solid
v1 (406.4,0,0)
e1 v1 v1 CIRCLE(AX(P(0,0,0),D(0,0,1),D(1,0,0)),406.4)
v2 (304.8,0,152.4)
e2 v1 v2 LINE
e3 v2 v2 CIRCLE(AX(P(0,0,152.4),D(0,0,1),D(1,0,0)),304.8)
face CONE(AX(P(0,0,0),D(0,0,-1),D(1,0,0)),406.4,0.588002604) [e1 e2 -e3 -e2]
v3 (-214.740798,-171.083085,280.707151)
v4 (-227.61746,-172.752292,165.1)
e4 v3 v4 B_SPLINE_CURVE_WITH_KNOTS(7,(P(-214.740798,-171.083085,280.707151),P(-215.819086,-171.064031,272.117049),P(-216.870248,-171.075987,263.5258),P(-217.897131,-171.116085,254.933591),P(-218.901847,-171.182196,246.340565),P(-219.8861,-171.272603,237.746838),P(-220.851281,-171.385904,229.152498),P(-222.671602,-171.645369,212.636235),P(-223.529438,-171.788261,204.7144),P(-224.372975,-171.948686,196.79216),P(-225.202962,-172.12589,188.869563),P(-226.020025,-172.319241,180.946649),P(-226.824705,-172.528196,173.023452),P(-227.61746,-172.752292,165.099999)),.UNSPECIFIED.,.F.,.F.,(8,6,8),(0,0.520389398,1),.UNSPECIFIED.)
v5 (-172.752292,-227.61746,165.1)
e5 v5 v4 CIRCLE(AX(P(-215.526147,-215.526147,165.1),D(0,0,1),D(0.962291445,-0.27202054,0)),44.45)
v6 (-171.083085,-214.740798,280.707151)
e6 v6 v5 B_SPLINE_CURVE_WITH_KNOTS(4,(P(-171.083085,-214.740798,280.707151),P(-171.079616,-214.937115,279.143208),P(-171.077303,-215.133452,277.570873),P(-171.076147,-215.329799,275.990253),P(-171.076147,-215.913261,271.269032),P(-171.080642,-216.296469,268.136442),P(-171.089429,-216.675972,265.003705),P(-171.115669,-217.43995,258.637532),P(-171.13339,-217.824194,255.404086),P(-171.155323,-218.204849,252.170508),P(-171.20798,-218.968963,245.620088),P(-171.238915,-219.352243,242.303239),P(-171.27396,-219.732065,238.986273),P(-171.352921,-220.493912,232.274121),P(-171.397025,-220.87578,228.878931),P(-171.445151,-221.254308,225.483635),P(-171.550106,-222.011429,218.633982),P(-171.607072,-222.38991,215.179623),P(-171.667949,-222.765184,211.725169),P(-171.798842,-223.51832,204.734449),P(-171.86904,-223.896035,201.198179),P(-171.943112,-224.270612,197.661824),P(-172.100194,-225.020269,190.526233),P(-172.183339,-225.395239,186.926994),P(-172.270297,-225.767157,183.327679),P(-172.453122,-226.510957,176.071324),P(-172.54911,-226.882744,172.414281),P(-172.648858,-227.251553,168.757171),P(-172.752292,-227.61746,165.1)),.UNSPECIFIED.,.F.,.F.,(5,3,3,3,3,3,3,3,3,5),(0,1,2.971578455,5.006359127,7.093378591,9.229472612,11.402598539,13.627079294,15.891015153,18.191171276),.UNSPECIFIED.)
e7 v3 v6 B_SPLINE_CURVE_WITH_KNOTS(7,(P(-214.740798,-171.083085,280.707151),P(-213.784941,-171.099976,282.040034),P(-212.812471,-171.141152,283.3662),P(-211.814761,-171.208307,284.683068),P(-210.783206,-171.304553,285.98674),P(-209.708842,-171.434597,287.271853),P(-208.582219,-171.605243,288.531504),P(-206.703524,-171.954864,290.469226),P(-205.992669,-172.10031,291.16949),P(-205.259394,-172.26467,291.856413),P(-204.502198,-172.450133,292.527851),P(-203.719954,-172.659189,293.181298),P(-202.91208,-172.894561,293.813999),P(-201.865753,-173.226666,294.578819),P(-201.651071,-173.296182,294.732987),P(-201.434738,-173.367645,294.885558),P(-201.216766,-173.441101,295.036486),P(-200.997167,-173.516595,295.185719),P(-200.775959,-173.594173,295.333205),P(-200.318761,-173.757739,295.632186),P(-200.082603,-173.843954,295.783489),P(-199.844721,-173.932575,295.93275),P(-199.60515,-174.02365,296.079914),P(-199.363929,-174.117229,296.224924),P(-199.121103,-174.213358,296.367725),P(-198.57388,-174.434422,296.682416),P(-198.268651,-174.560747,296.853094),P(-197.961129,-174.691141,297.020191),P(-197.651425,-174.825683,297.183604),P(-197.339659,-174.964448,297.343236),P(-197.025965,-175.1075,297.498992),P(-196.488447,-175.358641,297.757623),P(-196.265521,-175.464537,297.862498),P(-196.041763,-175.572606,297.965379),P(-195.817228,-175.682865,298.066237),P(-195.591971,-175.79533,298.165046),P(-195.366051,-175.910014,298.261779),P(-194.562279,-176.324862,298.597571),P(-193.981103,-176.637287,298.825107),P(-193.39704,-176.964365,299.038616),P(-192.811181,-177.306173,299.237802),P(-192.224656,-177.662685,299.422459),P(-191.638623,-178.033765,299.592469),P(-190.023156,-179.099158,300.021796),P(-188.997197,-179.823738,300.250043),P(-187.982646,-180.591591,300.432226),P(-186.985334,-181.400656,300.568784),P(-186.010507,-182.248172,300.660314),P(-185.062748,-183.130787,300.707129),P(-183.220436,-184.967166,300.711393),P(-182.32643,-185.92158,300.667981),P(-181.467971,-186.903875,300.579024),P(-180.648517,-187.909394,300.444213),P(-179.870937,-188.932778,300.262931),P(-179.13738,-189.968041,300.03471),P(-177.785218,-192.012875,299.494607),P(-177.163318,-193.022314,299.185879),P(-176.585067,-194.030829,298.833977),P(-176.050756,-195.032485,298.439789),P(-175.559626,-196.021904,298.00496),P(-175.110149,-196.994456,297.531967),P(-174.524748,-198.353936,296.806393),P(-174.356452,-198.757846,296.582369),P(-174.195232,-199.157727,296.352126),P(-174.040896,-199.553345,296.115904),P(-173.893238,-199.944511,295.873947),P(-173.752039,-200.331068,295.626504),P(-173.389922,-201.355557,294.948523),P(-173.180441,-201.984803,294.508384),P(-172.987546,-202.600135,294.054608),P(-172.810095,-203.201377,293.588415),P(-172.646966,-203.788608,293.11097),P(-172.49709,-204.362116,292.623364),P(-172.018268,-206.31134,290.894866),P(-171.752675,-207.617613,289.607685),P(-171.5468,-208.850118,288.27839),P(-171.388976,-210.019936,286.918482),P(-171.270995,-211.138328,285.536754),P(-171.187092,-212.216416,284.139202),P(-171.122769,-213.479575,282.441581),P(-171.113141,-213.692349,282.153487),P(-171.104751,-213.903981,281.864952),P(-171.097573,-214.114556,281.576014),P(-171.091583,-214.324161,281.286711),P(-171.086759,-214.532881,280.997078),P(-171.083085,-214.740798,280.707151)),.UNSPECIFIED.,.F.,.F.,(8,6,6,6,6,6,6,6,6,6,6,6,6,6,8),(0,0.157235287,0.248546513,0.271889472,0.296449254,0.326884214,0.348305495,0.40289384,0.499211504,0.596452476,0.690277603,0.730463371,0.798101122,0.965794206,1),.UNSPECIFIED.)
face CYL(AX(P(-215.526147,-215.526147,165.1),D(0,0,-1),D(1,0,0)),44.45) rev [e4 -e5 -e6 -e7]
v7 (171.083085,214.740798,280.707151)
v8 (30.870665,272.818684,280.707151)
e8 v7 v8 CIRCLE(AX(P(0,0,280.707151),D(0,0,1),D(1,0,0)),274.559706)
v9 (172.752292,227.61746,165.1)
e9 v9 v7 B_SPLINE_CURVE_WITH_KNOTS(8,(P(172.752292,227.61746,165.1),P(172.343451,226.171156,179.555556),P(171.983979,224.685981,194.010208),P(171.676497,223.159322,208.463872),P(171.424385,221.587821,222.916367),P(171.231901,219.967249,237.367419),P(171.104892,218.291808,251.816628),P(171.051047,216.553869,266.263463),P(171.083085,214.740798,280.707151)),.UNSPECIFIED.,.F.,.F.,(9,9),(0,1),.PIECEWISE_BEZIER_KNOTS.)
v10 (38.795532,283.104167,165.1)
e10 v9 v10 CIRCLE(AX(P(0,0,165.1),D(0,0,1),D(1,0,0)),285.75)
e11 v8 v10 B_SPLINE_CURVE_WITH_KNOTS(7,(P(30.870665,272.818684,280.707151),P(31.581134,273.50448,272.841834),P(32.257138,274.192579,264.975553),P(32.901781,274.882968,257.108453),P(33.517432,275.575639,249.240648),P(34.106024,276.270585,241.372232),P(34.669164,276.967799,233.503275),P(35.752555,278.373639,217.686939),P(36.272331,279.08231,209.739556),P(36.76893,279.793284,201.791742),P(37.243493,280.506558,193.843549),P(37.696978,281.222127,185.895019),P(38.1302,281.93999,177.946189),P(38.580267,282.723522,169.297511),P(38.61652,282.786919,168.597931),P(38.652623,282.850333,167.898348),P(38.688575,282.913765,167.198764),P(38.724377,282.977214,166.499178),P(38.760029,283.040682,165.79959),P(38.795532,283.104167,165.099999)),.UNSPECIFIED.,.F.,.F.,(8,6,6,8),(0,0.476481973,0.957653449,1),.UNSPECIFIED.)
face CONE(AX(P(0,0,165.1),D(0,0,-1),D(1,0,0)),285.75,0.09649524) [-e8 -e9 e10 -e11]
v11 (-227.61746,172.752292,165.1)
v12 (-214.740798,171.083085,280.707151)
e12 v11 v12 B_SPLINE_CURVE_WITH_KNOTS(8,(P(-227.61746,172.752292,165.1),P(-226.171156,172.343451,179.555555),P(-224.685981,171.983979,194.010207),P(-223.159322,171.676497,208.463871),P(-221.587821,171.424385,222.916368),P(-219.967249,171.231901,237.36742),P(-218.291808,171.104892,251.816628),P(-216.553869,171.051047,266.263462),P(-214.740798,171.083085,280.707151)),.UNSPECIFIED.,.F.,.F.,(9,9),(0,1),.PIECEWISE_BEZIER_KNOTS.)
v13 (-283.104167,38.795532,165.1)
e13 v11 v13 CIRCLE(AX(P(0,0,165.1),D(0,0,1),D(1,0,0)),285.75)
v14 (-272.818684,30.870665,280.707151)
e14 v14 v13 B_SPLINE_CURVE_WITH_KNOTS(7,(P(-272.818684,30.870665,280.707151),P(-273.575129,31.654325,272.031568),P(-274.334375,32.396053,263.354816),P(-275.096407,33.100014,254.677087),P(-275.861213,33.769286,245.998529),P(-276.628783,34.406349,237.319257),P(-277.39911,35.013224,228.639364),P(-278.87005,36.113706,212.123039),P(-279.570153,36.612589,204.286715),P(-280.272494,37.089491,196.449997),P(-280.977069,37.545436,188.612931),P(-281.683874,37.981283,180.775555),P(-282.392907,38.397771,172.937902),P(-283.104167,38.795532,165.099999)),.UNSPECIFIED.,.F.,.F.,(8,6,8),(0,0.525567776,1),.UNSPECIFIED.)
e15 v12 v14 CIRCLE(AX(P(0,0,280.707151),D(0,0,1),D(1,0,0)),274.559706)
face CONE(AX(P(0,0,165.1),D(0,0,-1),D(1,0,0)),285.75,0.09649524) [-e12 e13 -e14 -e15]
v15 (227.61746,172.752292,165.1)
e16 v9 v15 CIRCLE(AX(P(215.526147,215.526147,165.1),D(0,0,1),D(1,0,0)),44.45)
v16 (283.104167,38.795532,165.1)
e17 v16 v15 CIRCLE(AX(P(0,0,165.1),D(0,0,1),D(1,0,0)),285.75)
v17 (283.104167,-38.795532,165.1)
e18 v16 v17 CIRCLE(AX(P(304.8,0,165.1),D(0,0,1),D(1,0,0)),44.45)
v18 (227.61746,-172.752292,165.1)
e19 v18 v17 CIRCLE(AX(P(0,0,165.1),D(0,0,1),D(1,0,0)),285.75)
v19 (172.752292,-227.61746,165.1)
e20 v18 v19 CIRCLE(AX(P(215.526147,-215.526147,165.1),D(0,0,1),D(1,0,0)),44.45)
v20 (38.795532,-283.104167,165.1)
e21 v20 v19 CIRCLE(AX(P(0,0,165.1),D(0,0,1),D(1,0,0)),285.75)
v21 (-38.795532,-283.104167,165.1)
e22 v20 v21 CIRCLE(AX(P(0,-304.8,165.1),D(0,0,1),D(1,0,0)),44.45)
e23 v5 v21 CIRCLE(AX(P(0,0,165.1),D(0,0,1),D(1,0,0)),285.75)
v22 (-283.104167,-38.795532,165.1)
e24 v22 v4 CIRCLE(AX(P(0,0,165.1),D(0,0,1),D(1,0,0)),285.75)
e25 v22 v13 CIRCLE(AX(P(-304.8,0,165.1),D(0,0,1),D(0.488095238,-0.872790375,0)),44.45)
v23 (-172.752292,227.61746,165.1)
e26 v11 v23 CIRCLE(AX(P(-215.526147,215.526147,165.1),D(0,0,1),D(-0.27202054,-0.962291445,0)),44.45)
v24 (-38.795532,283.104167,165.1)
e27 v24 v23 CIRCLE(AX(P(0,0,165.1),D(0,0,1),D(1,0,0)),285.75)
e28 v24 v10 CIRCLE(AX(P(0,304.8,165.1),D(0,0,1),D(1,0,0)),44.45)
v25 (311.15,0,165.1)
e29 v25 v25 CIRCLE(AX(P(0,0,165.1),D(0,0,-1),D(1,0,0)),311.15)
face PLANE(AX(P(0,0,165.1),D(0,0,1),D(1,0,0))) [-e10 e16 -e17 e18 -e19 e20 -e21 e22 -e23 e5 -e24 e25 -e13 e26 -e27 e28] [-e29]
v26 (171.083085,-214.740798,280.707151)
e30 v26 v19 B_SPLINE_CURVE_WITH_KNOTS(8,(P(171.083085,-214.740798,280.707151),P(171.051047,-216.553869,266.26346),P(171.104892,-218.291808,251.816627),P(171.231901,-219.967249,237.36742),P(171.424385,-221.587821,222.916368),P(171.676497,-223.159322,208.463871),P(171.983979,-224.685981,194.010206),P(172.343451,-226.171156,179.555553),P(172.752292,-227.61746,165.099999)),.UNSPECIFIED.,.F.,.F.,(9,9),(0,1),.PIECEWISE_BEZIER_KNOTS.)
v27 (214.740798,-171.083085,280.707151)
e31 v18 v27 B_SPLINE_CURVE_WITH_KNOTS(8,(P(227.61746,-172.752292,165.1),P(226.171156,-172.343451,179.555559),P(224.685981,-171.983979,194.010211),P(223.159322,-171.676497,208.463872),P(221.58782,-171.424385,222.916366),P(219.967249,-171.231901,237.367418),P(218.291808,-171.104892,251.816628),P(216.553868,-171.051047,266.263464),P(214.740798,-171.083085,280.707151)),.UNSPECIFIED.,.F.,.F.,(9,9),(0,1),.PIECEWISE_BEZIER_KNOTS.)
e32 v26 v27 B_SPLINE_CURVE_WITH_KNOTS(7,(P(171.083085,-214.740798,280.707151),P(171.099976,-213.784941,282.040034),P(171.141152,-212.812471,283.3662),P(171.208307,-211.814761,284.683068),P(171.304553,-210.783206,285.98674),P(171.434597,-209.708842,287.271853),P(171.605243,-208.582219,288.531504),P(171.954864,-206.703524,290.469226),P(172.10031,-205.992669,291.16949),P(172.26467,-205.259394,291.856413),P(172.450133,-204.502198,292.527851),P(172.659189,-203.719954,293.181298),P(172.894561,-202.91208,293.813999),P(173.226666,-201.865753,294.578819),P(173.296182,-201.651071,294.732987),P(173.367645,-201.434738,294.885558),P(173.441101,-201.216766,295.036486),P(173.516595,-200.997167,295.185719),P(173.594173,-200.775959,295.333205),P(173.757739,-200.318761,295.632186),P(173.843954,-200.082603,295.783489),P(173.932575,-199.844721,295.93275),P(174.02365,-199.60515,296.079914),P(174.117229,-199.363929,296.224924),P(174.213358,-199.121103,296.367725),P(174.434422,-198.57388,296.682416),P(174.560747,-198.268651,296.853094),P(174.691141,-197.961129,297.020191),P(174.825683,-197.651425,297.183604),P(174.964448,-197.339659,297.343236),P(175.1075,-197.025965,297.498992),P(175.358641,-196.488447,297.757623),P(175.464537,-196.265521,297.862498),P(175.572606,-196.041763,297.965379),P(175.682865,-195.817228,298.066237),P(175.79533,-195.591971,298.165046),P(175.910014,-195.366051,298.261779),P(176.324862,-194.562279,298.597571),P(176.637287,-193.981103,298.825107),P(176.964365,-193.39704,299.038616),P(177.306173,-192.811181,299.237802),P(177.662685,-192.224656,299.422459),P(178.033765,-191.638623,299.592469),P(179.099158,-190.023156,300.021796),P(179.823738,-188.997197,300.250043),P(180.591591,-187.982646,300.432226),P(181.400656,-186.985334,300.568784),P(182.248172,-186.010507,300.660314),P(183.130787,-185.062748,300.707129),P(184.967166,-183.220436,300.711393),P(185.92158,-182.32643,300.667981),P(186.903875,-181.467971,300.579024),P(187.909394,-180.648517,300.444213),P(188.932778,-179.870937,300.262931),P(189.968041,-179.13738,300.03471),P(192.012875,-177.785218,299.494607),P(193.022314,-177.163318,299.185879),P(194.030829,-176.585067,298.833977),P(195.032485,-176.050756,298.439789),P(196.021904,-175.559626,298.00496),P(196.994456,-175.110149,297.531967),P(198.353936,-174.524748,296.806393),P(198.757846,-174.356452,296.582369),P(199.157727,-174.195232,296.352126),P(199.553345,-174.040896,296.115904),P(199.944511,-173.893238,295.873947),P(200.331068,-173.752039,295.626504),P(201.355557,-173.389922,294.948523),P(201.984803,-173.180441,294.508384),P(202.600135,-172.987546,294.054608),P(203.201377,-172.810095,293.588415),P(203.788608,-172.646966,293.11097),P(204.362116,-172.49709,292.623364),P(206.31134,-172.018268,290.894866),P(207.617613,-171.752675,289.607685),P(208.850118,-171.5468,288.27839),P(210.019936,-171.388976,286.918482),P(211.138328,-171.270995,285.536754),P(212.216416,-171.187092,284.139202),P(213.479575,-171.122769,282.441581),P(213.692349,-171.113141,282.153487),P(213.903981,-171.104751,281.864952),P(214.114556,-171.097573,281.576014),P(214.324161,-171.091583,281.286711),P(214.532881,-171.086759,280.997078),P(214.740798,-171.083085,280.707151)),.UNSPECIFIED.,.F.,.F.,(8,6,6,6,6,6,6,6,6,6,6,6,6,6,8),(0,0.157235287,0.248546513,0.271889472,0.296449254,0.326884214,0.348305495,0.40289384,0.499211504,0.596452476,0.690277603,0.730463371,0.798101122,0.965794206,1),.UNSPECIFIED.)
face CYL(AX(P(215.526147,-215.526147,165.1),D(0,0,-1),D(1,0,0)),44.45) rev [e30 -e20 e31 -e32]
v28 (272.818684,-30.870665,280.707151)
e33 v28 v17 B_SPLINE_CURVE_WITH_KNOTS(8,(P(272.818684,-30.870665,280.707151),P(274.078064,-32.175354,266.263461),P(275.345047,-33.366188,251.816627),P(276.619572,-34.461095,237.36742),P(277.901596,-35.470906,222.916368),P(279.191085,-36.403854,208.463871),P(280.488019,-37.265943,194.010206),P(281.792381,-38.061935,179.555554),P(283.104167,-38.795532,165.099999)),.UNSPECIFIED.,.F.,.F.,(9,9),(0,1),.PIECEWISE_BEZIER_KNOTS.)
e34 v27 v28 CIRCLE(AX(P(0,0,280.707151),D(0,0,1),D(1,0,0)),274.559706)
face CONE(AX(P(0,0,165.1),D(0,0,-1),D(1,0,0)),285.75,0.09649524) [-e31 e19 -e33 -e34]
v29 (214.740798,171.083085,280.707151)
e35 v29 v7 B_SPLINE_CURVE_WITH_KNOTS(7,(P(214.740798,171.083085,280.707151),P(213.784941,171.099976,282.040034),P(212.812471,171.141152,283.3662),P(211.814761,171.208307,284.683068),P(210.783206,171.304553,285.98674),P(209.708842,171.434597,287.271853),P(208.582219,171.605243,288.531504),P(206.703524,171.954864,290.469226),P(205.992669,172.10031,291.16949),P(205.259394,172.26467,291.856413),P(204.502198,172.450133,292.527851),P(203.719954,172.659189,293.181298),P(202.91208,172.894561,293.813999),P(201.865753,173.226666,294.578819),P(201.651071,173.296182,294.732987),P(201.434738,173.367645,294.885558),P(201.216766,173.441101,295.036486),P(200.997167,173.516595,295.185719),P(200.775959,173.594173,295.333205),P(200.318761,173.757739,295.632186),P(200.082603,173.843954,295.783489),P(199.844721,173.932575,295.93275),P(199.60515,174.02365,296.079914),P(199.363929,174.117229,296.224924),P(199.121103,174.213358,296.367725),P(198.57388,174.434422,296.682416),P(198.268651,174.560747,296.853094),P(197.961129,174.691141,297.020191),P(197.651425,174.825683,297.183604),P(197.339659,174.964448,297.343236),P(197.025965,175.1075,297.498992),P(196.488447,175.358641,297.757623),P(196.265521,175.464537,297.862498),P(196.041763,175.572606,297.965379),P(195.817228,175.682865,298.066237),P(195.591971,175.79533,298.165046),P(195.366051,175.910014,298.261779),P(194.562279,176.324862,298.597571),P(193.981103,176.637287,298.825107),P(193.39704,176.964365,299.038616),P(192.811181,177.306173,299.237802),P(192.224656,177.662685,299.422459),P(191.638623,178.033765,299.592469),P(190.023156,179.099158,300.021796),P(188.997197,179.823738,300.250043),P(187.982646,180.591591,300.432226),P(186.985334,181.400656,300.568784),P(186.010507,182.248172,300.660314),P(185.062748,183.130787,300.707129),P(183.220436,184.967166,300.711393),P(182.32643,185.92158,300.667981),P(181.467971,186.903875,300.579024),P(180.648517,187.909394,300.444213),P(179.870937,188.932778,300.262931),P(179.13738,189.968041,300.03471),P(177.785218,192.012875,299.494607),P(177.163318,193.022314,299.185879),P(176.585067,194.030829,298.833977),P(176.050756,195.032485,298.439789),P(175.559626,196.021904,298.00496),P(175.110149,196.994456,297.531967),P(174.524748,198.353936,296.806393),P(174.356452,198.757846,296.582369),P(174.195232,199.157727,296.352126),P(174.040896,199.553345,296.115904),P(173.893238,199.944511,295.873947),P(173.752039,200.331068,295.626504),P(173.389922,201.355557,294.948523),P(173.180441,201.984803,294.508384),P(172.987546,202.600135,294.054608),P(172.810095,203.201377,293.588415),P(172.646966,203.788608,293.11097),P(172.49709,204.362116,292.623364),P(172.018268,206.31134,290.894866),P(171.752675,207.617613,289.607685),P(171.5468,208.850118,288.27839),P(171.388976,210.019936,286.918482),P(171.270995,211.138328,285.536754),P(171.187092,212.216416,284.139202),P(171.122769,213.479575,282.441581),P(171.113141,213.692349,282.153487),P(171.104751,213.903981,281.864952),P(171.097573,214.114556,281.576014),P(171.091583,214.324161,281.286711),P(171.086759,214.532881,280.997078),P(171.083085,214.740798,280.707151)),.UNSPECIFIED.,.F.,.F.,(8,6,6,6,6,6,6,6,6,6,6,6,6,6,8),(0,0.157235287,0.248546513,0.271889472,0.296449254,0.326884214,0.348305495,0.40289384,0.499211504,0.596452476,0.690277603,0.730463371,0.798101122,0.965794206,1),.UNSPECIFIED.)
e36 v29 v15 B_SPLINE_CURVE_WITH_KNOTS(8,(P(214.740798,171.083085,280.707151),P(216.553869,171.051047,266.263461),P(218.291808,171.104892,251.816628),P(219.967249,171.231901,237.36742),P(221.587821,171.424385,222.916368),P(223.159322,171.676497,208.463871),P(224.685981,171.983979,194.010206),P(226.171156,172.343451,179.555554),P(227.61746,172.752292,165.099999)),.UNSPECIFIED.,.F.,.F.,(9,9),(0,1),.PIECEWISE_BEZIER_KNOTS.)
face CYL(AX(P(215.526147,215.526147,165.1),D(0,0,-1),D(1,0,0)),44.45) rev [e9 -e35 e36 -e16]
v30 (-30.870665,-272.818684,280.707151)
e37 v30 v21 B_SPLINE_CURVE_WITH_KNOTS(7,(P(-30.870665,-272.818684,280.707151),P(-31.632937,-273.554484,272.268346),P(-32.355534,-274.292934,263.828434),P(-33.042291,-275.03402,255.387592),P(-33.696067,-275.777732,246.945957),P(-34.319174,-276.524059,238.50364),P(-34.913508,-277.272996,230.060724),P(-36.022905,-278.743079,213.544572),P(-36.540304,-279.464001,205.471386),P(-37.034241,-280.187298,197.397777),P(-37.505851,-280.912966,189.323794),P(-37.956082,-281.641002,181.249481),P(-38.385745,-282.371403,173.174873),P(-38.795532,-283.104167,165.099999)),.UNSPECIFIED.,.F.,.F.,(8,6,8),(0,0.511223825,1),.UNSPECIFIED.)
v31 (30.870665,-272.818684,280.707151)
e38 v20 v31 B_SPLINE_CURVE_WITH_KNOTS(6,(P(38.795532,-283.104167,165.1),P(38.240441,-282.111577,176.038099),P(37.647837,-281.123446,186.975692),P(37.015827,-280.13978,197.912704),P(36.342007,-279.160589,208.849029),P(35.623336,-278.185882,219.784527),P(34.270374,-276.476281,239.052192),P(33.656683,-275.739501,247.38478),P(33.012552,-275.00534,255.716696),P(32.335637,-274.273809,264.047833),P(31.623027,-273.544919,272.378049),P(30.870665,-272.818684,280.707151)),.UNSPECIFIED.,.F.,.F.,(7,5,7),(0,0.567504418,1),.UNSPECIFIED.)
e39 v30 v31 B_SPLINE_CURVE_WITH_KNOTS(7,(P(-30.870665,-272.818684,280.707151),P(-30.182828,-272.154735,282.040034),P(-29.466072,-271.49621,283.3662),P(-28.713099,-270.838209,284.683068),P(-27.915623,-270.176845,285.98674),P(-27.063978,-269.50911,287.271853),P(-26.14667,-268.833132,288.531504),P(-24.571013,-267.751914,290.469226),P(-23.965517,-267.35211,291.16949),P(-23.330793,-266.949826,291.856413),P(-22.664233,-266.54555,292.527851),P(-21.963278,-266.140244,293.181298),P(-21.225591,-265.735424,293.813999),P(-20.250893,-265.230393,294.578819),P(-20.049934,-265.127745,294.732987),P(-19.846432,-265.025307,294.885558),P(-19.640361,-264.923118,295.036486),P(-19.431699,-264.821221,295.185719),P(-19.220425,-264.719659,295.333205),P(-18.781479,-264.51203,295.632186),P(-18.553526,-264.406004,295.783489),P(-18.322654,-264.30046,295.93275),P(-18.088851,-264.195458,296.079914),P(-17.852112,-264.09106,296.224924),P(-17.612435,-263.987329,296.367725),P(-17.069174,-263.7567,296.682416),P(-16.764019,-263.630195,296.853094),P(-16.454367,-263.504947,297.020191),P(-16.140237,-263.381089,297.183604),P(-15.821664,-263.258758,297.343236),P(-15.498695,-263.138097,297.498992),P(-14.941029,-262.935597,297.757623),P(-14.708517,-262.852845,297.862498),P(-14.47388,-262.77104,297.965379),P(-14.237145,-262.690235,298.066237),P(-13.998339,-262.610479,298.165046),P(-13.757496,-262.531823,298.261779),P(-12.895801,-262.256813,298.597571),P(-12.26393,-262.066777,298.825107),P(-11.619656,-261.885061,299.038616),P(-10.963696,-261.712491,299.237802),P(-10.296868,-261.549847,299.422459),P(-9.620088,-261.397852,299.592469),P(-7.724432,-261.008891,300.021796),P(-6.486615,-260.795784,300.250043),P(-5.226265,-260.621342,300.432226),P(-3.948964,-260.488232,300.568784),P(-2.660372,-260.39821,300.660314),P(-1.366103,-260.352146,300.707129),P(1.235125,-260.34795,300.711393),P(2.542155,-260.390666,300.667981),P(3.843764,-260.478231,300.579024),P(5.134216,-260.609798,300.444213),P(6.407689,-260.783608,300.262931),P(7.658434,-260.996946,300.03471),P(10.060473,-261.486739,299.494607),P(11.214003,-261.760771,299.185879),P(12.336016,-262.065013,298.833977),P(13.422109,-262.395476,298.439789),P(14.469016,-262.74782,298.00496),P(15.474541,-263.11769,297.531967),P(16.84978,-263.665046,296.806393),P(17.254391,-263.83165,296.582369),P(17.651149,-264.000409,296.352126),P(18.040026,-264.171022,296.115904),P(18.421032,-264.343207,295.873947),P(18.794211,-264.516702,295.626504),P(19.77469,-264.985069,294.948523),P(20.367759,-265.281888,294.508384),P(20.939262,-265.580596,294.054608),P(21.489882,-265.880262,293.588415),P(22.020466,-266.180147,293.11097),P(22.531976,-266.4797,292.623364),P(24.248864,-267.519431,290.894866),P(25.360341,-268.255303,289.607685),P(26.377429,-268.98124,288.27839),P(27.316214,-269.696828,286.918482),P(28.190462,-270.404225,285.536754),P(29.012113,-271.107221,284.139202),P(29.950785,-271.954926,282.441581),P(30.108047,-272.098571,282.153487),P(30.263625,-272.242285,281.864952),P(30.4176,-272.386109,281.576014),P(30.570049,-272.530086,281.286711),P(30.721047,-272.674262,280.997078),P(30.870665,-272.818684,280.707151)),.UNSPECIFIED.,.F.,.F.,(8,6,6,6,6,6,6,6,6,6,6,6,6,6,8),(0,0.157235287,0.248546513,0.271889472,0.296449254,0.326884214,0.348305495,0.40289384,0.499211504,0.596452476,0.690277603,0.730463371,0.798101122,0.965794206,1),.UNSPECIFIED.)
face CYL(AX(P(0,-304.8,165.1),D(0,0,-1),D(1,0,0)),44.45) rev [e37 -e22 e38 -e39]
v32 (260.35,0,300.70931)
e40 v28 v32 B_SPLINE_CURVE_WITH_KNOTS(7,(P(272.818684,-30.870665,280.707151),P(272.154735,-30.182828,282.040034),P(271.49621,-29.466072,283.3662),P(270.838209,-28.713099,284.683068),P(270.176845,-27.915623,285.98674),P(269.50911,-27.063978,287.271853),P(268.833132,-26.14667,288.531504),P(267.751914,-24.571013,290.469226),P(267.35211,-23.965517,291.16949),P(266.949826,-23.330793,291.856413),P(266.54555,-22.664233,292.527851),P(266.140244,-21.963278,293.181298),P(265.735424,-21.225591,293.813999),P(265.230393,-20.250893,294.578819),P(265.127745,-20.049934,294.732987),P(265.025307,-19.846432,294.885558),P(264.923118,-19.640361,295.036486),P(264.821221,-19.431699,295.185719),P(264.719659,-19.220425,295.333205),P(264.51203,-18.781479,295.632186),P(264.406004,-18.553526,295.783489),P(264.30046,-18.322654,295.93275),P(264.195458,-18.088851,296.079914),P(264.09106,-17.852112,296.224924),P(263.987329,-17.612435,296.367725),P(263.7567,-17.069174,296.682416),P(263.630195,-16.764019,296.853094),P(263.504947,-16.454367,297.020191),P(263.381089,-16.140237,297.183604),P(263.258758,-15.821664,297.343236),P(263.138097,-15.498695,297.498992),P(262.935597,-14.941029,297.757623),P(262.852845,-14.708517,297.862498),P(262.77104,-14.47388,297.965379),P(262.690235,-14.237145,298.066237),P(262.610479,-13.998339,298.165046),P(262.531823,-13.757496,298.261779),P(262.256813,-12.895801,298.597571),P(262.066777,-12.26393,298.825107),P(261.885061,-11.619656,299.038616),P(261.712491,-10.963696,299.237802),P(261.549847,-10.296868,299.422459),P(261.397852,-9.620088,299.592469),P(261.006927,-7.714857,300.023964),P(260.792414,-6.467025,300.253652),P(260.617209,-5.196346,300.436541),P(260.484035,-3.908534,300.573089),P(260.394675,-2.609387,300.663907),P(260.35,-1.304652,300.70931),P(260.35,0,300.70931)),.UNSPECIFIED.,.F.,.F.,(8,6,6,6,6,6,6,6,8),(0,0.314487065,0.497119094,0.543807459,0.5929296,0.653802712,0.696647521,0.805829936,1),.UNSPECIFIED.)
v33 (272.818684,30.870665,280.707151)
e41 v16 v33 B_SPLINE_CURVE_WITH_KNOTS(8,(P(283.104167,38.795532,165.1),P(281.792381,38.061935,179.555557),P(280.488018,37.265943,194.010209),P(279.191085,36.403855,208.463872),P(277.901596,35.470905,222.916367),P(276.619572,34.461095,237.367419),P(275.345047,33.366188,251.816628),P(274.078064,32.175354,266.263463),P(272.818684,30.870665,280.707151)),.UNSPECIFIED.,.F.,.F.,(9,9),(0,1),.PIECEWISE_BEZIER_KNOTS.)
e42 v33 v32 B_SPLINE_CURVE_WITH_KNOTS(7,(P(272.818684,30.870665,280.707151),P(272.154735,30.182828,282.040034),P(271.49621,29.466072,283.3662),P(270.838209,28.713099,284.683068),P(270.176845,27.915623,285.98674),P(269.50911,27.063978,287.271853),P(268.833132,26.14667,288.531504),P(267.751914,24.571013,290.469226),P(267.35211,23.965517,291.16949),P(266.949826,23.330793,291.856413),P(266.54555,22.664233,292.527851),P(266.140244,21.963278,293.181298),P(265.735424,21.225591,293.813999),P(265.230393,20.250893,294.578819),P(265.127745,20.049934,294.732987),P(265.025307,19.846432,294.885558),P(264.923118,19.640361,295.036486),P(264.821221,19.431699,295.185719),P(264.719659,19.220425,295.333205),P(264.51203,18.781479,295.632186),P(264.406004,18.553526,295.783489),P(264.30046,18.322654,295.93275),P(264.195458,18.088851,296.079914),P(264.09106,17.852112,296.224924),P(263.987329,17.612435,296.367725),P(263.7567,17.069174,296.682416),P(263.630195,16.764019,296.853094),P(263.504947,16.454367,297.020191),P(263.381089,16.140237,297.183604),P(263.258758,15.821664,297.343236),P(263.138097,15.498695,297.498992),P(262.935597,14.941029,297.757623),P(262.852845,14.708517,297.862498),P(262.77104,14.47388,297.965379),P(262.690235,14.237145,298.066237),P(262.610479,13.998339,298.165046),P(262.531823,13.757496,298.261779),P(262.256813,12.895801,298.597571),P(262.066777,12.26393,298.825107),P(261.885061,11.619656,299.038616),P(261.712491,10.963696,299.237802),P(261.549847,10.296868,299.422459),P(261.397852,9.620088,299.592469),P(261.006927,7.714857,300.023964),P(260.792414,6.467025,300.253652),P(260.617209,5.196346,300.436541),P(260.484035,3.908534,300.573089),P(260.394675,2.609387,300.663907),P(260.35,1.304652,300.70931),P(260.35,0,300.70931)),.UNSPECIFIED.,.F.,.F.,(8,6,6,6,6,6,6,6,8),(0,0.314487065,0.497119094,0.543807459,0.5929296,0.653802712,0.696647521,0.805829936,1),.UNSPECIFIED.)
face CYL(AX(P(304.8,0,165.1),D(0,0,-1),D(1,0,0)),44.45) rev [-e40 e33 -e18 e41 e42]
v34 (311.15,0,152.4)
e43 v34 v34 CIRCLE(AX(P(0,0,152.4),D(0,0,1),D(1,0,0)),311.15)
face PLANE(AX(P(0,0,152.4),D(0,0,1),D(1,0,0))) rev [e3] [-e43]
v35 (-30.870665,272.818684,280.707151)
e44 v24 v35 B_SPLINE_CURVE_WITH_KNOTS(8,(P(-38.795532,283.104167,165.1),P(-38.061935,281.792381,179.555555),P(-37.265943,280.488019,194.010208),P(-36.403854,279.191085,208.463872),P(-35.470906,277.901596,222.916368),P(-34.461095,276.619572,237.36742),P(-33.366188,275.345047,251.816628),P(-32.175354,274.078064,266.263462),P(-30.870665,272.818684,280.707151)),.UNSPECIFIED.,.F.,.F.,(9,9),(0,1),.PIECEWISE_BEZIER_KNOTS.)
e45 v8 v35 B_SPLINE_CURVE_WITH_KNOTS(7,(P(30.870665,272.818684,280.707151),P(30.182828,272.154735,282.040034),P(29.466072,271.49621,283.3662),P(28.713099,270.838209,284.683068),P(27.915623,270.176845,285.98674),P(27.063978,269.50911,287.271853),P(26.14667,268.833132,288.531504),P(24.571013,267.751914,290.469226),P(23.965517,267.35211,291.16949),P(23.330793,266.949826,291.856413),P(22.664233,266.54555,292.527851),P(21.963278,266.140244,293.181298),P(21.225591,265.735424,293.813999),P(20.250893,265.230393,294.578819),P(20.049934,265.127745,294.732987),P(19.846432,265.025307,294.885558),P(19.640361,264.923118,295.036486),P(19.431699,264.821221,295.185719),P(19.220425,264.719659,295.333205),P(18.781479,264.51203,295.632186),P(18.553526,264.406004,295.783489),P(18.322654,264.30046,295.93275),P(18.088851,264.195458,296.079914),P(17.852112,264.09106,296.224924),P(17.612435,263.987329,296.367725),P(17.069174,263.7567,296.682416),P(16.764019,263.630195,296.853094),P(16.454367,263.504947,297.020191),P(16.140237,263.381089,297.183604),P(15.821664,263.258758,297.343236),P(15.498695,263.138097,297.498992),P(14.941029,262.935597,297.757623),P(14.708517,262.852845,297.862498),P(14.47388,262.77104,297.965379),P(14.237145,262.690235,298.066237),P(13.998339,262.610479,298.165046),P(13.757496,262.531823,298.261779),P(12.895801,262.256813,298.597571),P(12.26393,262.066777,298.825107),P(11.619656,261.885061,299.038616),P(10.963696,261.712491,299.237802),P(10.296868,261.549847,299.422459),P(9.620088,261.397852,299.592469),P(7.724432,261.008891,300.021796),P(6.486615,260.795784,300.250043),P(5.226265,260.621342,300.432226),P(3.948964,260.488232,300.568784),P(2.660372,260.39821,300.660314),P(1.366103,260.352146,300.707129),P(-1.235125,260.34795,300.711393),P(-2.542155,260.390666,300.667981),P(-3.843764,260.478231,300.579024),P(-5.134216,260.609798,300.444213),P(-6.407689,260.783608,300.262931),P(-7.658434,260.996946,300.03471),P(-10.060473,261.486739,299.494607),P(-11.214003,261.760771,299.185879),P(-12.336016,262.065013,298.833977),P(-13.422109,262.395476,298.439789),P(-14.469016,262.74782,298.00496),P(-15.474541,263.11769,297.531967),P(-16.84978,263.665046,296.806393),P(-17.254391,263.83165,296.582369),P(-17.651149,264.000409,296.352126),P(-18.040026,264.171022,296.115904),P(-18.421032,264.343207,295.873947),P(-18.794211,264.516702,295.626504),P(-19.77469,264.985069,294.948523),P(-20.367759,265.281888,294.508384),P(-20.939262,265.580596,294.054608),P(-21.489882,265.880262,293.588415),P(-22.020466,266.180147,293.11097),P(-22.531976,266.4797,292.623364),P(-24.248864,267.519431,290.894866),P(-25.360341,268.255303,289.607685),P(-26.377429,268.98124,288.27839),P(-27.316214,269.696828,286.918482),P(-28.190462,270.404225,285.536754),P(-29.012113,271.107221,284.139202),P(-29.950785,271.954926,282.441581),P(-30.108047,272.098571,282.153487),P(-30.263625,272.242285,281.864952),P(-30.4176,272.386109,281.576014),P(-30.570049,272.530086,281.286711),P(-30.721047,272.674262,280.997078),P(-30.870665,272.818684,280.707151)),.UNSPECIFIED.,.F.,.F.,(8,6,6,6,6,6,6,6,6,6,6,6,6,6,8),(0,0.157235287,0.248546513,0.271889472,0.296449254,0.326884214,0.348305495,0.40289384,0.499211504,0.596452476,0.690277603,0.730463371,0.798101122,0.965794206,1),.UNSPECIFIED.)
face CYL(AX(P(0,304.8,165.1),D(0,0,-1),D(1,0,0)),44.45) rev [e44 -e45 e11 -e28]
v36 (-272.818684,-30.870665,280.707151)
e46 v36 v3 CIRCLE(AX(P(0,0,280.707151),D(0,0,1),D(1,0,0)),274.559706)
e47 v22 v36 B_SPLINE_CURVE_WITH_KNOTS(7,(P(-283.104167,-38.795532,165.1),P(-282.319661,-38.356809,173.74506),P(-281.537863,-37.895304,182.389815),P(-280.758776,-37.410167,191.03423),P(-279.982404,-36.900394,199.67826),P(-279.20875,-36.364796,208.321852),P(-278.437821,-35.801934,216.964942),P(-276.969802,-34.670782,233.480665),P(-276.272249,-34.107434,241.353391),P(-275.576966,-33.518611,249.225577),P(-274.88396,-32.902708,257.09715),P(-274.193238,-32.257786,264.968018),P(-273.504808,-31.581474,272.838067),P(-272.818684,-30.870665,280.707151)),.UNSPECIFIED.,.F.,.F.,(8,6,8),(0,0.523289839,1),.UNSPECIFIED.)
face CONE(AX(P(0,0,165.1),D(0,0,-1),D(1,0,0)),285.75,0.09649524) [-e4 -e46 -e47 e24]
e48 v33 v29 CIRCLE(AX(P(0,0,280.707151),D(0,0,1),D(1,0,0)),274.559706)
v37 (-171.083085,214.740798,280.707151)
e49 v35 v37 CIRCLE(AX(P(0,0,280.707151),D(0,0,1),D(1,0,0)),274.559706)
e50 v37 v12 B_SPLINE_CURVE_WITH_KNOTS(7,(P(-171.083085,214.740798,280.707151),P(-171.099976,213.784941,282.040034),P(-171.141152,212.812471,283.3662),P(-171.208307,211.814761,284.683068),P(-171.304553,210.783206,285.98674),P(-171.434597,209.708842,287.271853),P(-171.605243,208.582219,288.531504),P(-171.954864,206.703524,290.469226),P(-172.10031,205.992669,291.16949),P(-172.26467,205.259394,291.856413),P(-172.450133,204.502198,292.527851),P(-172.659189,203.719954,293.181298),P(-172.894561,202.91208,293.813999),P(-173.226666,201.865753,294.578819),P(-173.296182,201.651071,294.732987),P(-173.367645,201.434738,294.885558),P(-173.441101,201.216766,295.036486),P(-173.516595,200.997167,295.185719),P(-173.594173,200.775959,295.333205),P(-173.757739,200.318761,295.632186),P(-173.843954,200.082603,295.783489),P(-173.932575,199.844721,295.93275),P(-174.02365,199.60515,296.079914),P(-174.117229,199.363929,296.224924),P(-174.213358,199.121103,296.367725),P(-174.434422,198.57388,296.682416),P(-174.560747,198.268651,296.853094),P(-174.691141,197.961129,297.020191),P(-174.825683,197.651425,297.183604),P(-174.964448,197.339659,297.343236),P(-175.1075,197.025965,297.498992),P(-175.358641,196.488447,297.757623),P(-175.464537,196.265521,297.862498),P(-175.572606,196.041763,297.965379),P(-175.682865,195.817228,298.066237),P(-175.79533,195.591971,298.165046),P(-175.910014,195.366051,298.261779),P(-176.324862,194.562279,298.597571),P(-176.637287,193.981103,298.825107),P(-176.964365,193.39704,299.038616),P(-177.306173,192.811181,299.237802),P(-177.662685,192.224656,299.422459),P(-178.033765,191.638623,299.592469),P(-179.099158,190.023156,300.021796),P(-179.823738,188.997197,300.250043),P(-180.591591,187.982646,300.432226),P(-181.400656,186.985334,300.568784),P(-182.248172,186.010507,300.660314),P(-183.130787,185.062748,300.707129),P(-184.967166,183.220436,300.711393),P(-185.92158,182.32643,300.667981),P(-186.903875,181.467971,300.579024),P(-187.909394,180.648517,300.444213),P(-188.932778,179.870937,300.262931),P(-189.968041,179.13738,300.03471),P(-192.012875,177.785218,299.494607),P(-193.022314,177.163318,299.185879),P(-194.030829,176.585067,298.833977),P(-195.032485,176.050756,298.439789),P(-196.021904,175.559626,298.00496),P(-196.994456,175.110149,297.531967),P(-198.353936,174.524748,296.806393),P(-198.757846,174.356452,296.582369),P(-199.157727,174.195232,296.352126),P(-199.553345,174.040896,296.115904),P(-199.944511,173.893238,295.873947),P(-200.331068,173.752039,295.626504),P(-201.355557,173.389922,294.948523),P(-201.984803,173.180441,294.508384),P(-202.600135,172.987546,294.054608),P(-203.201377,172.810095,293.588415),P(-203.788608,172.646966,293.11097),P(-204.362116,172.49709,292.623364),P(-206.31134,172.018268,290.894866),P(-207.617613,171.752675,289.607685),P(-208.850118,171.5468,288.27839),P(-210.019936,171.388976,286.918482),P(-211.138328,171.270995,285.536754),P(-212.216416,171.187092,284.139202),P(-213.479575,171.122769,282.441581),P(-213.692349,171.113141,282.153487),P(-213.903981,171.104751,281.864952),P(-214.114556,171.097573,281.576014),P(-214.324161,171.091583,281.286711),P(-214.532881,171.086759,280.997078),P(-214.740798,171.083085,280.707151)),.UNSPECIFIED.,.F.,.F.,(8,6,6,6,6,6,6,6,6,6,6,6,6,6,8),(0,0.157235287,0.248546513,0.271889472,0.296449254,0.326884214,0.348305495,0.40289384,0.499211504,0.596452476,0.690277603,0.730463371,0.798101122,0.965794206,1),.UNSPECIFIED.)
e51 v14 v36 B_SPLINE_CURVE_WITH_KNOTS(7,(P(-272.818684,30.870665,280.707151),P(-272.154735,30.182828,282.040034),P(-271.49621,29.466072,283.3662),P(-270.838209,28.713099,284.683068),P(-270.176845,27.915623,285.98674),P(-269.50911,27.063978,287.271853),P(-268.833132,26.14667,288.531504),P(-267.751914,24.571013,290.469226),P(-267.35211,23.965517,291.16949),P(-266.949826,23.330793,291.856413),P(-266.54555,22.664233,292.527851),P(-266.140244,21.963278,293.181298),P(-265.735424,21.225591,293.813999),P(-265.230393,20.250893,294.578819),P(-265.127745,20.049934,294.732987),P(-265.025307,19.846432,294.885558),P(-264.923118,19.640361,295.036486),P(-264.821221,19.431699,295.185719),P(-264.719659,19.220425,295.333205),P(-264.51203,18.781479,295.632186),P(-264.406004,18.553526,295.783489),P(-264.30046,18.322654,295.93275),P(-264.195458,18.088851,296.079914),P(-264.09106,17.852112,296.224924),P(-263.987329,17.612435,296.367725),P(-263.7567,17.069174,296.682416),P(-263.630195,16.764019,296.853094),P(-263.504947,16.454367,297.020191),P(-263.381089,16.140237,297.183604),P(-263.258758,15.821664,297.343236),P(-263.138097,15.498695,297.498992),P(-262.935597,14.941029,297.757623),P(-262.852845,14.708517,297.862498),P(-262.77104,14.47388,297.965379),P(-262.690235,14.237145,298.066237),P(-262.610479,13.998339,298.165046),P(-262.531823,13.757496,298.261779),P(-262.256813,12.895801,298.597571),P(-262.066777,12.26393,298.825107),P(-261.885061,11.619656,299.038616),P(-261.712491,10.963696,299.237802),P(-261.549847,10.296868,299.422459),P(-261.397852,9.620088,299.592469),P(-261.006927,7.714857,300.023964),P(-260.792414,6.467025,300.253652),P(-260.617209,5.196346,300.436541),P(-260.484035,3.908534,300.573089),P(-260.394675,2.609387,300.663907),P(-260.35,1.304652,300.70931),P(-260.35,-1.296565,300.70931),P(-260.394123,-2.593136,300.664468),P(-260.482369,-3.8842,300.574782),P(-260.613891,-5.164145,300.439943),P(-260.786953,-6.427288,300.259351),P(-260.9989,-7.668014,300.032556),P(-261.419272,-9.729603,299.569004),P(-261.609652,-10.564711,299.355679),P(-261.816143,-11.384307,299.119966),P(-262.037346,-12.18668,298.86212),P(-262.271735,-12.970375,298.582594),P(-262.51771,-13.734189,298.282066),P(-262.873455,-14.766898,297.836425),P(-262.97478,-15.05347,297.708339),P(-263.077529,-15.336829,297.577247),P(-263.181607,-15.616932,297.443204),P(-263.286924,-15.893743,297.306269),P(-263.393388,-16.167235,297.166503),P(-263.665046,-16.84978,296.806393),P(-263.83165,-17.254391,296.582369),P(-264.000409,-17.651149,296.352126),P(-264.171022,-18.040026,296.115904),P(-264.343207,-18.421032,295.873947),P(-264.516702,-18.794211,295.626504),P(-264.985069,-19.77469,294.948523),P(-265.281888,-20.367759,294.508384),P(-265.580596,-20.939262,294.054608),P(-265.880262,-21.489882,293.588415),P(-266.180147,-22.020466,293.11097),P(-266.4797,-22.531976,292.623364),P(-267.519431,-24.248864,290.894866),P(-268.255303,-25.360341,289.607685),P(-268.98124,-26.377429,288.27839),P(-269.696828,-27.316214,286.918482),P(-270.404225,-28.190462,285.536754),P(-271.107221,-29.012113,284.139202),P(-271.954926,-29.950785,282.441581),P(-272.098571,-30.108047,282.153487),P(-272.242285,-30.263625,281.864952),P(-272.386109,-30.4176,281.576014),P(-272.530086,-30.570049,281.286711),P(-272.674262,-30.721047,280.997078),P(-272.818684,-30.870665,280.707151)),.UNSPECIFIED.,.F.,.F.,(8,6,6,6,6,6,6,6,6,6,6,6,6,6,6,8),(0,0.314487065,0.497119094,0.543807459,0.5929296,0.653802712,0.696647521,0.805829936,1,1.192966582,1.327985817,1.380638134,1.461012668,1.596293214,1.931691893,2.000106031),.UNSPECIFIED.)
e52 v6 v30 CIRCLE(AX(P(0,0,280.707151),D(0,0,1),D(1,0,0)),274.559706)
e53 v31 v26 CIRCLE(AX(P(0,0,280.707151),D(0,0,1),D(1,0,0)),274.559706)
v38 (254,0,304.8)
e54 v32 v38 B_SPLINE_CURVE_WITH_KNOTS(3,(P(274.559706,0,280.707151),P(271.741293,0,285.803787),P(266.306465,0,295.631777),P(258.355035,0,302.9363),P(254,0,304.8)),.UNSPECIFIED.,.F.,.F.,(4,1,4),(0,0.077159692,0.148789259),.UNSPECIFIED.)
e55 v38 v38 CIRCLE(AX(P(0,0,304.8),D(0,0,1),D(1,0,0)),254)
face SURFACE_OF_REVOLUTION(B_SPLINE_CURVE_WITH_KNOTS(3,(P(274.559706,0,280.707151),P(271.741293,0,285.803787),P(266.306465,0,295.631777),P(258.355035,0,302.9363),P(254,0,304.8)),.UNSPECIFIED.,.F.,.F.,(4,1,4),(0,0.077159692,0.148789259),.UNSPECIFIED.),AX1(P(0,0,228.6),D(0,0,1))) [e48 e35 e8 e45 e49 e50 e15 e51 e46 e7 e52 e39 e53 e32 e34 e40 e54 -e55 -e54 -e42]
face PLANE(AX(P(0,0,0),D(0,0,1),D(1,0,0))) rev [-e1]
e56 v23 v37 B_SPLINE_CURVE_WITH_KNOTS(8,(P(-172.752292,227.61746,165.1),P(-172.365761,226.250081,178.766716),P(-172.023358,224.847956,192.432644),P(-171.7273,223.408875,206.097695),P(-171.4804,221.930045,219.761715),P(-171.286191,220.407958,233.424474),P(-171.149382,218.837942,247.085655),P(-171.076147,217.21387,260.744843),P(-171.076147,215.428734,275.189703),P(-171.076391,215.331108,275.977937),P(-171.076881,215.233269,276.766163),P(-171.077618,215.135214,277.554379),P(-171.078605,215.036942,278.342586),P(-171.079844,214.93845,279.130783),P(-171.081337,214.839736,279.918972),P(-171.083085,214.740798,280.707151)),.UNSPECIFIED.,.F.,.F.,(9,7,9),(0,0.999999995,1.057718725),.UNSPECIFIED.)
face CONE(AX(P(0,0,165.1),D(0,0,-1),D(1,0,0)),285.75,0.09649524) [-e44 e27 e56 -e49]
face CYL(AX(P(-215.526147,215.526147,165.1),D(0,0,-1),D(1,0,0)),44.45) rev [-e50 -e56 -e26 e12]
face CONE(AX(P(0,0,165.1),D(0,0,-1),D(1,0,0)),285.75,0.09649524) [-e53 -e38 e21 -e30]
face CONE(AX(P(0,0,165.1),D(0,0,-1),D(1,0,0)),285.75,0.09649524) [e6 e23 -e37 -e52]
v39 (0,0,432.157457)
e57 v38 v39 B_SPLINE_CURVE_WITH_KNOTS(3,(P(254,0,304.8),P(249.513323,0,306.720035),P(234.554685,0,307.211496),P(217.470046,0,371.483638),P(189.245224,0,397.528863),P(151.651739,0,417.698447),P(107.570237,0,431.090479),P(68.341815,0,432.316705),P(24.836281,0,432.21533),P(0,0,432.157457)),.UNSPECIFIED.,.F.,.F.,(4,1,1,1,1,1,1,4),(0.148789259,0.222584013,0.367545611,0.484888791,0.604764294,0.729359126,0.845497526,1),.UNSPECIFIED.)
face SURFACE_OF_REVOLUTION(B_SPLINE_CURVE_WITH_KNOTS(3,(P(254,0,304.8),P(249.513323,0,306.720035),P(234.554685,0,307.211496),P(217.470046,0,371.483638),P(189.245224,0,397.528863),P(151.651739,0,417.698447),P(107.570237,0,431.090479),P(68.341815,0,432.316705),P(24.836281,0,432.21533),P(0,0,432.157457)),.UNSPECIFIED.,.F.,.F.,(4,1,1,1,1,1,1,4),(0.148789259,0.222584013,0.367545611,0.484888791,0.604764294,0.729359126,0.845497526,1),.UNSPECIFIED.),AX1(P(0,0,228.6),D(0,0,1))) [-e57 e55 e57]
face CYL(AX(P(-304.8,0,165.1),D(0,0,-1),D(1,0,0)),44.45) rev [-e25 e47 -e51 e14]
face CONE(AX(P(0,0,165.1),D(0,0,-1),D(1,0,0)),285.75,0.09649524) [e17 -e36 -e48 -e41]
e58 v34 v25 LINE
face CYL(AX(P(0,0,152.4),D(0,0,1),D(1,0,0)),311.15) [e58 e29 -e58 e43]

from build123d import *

# Parameters (mm, degrees)
F2_R     = 44.45
F3_DEPTH = 152.4


with BuildPart() as f1:
    # F0 (on Front) → F1 (revolve)
    with BuildSketch(Plane.XZ):
        Polygon((0, 152.4), (0, 0), (406.4, 0), (304.8, 152.4), align=None)
        with BuildLine():
            Line((0, 304.8), (0, 152.4))
            Line((0, 152.4), (304.8, 152.4))
            Line((304.8, 152.4), (311.15, 152.4))
            Line((311.15, 152.4), (311.15, 165.1))
            Line((311.15, 165.1), (285.75, 165.1))
            Line((285.75, 165.1), (274.5597064495, 280.7071506977))
            add(Edge.make_bspline(
                [(274.5597064495, 280.7071506977), (271.7412931371, 285.8037865906), (266.3064654877, 295.6317765268), (258.3550352472, 302.9362996616), (254, 304.8)],
                knots=[0, 0, 0, 0, 0.0771596923, 0.1487892593, 0.1487892593, 0.1487892593, 0.1487892593], degree=3))
            Line((254, 304.8), (0, 304.8))
        make_face()
        with BuildLine():
            Line((0, 432.1574568748), (0, 304.8))
            Line((0, 304.8), (254, 304.8))
            add(Edge.make_bspline(
                [(254, 304.8), (249.5133226892, 306.7200354412), (234.5546852881, 307.2114964849), (217.4700462275, 371.4836376253), (189.2452236448, 397.5288625798), (151.6517387873, 417.6984471616), (107.5702368284, 431.0904789048), (68.3418151338, 432.3167053391), (24.8362806494, 432.2153297824), (0, 432.1574568748)],
                knots=[0.1487892593, 0.1487892593, 0.1487892593, 0.1487892593, 0.222584013, 0.3675456115, 0.4848887913, 0.6047642941, 0.729359126, 0.8454975262, 1, 1, 1, 1], degree=3))
        make_face()
    revolve(axis=Axis((0, 0, 228.6), (0, 0, 1)))

    # F2 (on face) → F3 (cut)
    with BuildSketch(Plane.XY.offset(165.1)):
        with Locations((0, 304.8)):
            Circle(F2_R)
        with Locations((-215.5261469057, 215.5261469057)):
            Circle(F2_R)
        with Locations((-304.8, 0)):
            Circle(F2_R)
        with Locations((-215.5261469057, -215.5261469057)):
            Circle(F2_R)
        with Locations((0, -304.8)):
            Circle(F2_R)
        with Locations((215.5261469057, -215.5261469057)):
            Circle(F2_R)
        with Locations((304.8, 0)):
            Circle(F2_R)
        with Locations((215.5261469057, 215.5261469057)):
            Circle(F2_R)
    extrude(amount=F3_DEPTH, mode=Mode.SUBTRACT)


solid = f1.part
